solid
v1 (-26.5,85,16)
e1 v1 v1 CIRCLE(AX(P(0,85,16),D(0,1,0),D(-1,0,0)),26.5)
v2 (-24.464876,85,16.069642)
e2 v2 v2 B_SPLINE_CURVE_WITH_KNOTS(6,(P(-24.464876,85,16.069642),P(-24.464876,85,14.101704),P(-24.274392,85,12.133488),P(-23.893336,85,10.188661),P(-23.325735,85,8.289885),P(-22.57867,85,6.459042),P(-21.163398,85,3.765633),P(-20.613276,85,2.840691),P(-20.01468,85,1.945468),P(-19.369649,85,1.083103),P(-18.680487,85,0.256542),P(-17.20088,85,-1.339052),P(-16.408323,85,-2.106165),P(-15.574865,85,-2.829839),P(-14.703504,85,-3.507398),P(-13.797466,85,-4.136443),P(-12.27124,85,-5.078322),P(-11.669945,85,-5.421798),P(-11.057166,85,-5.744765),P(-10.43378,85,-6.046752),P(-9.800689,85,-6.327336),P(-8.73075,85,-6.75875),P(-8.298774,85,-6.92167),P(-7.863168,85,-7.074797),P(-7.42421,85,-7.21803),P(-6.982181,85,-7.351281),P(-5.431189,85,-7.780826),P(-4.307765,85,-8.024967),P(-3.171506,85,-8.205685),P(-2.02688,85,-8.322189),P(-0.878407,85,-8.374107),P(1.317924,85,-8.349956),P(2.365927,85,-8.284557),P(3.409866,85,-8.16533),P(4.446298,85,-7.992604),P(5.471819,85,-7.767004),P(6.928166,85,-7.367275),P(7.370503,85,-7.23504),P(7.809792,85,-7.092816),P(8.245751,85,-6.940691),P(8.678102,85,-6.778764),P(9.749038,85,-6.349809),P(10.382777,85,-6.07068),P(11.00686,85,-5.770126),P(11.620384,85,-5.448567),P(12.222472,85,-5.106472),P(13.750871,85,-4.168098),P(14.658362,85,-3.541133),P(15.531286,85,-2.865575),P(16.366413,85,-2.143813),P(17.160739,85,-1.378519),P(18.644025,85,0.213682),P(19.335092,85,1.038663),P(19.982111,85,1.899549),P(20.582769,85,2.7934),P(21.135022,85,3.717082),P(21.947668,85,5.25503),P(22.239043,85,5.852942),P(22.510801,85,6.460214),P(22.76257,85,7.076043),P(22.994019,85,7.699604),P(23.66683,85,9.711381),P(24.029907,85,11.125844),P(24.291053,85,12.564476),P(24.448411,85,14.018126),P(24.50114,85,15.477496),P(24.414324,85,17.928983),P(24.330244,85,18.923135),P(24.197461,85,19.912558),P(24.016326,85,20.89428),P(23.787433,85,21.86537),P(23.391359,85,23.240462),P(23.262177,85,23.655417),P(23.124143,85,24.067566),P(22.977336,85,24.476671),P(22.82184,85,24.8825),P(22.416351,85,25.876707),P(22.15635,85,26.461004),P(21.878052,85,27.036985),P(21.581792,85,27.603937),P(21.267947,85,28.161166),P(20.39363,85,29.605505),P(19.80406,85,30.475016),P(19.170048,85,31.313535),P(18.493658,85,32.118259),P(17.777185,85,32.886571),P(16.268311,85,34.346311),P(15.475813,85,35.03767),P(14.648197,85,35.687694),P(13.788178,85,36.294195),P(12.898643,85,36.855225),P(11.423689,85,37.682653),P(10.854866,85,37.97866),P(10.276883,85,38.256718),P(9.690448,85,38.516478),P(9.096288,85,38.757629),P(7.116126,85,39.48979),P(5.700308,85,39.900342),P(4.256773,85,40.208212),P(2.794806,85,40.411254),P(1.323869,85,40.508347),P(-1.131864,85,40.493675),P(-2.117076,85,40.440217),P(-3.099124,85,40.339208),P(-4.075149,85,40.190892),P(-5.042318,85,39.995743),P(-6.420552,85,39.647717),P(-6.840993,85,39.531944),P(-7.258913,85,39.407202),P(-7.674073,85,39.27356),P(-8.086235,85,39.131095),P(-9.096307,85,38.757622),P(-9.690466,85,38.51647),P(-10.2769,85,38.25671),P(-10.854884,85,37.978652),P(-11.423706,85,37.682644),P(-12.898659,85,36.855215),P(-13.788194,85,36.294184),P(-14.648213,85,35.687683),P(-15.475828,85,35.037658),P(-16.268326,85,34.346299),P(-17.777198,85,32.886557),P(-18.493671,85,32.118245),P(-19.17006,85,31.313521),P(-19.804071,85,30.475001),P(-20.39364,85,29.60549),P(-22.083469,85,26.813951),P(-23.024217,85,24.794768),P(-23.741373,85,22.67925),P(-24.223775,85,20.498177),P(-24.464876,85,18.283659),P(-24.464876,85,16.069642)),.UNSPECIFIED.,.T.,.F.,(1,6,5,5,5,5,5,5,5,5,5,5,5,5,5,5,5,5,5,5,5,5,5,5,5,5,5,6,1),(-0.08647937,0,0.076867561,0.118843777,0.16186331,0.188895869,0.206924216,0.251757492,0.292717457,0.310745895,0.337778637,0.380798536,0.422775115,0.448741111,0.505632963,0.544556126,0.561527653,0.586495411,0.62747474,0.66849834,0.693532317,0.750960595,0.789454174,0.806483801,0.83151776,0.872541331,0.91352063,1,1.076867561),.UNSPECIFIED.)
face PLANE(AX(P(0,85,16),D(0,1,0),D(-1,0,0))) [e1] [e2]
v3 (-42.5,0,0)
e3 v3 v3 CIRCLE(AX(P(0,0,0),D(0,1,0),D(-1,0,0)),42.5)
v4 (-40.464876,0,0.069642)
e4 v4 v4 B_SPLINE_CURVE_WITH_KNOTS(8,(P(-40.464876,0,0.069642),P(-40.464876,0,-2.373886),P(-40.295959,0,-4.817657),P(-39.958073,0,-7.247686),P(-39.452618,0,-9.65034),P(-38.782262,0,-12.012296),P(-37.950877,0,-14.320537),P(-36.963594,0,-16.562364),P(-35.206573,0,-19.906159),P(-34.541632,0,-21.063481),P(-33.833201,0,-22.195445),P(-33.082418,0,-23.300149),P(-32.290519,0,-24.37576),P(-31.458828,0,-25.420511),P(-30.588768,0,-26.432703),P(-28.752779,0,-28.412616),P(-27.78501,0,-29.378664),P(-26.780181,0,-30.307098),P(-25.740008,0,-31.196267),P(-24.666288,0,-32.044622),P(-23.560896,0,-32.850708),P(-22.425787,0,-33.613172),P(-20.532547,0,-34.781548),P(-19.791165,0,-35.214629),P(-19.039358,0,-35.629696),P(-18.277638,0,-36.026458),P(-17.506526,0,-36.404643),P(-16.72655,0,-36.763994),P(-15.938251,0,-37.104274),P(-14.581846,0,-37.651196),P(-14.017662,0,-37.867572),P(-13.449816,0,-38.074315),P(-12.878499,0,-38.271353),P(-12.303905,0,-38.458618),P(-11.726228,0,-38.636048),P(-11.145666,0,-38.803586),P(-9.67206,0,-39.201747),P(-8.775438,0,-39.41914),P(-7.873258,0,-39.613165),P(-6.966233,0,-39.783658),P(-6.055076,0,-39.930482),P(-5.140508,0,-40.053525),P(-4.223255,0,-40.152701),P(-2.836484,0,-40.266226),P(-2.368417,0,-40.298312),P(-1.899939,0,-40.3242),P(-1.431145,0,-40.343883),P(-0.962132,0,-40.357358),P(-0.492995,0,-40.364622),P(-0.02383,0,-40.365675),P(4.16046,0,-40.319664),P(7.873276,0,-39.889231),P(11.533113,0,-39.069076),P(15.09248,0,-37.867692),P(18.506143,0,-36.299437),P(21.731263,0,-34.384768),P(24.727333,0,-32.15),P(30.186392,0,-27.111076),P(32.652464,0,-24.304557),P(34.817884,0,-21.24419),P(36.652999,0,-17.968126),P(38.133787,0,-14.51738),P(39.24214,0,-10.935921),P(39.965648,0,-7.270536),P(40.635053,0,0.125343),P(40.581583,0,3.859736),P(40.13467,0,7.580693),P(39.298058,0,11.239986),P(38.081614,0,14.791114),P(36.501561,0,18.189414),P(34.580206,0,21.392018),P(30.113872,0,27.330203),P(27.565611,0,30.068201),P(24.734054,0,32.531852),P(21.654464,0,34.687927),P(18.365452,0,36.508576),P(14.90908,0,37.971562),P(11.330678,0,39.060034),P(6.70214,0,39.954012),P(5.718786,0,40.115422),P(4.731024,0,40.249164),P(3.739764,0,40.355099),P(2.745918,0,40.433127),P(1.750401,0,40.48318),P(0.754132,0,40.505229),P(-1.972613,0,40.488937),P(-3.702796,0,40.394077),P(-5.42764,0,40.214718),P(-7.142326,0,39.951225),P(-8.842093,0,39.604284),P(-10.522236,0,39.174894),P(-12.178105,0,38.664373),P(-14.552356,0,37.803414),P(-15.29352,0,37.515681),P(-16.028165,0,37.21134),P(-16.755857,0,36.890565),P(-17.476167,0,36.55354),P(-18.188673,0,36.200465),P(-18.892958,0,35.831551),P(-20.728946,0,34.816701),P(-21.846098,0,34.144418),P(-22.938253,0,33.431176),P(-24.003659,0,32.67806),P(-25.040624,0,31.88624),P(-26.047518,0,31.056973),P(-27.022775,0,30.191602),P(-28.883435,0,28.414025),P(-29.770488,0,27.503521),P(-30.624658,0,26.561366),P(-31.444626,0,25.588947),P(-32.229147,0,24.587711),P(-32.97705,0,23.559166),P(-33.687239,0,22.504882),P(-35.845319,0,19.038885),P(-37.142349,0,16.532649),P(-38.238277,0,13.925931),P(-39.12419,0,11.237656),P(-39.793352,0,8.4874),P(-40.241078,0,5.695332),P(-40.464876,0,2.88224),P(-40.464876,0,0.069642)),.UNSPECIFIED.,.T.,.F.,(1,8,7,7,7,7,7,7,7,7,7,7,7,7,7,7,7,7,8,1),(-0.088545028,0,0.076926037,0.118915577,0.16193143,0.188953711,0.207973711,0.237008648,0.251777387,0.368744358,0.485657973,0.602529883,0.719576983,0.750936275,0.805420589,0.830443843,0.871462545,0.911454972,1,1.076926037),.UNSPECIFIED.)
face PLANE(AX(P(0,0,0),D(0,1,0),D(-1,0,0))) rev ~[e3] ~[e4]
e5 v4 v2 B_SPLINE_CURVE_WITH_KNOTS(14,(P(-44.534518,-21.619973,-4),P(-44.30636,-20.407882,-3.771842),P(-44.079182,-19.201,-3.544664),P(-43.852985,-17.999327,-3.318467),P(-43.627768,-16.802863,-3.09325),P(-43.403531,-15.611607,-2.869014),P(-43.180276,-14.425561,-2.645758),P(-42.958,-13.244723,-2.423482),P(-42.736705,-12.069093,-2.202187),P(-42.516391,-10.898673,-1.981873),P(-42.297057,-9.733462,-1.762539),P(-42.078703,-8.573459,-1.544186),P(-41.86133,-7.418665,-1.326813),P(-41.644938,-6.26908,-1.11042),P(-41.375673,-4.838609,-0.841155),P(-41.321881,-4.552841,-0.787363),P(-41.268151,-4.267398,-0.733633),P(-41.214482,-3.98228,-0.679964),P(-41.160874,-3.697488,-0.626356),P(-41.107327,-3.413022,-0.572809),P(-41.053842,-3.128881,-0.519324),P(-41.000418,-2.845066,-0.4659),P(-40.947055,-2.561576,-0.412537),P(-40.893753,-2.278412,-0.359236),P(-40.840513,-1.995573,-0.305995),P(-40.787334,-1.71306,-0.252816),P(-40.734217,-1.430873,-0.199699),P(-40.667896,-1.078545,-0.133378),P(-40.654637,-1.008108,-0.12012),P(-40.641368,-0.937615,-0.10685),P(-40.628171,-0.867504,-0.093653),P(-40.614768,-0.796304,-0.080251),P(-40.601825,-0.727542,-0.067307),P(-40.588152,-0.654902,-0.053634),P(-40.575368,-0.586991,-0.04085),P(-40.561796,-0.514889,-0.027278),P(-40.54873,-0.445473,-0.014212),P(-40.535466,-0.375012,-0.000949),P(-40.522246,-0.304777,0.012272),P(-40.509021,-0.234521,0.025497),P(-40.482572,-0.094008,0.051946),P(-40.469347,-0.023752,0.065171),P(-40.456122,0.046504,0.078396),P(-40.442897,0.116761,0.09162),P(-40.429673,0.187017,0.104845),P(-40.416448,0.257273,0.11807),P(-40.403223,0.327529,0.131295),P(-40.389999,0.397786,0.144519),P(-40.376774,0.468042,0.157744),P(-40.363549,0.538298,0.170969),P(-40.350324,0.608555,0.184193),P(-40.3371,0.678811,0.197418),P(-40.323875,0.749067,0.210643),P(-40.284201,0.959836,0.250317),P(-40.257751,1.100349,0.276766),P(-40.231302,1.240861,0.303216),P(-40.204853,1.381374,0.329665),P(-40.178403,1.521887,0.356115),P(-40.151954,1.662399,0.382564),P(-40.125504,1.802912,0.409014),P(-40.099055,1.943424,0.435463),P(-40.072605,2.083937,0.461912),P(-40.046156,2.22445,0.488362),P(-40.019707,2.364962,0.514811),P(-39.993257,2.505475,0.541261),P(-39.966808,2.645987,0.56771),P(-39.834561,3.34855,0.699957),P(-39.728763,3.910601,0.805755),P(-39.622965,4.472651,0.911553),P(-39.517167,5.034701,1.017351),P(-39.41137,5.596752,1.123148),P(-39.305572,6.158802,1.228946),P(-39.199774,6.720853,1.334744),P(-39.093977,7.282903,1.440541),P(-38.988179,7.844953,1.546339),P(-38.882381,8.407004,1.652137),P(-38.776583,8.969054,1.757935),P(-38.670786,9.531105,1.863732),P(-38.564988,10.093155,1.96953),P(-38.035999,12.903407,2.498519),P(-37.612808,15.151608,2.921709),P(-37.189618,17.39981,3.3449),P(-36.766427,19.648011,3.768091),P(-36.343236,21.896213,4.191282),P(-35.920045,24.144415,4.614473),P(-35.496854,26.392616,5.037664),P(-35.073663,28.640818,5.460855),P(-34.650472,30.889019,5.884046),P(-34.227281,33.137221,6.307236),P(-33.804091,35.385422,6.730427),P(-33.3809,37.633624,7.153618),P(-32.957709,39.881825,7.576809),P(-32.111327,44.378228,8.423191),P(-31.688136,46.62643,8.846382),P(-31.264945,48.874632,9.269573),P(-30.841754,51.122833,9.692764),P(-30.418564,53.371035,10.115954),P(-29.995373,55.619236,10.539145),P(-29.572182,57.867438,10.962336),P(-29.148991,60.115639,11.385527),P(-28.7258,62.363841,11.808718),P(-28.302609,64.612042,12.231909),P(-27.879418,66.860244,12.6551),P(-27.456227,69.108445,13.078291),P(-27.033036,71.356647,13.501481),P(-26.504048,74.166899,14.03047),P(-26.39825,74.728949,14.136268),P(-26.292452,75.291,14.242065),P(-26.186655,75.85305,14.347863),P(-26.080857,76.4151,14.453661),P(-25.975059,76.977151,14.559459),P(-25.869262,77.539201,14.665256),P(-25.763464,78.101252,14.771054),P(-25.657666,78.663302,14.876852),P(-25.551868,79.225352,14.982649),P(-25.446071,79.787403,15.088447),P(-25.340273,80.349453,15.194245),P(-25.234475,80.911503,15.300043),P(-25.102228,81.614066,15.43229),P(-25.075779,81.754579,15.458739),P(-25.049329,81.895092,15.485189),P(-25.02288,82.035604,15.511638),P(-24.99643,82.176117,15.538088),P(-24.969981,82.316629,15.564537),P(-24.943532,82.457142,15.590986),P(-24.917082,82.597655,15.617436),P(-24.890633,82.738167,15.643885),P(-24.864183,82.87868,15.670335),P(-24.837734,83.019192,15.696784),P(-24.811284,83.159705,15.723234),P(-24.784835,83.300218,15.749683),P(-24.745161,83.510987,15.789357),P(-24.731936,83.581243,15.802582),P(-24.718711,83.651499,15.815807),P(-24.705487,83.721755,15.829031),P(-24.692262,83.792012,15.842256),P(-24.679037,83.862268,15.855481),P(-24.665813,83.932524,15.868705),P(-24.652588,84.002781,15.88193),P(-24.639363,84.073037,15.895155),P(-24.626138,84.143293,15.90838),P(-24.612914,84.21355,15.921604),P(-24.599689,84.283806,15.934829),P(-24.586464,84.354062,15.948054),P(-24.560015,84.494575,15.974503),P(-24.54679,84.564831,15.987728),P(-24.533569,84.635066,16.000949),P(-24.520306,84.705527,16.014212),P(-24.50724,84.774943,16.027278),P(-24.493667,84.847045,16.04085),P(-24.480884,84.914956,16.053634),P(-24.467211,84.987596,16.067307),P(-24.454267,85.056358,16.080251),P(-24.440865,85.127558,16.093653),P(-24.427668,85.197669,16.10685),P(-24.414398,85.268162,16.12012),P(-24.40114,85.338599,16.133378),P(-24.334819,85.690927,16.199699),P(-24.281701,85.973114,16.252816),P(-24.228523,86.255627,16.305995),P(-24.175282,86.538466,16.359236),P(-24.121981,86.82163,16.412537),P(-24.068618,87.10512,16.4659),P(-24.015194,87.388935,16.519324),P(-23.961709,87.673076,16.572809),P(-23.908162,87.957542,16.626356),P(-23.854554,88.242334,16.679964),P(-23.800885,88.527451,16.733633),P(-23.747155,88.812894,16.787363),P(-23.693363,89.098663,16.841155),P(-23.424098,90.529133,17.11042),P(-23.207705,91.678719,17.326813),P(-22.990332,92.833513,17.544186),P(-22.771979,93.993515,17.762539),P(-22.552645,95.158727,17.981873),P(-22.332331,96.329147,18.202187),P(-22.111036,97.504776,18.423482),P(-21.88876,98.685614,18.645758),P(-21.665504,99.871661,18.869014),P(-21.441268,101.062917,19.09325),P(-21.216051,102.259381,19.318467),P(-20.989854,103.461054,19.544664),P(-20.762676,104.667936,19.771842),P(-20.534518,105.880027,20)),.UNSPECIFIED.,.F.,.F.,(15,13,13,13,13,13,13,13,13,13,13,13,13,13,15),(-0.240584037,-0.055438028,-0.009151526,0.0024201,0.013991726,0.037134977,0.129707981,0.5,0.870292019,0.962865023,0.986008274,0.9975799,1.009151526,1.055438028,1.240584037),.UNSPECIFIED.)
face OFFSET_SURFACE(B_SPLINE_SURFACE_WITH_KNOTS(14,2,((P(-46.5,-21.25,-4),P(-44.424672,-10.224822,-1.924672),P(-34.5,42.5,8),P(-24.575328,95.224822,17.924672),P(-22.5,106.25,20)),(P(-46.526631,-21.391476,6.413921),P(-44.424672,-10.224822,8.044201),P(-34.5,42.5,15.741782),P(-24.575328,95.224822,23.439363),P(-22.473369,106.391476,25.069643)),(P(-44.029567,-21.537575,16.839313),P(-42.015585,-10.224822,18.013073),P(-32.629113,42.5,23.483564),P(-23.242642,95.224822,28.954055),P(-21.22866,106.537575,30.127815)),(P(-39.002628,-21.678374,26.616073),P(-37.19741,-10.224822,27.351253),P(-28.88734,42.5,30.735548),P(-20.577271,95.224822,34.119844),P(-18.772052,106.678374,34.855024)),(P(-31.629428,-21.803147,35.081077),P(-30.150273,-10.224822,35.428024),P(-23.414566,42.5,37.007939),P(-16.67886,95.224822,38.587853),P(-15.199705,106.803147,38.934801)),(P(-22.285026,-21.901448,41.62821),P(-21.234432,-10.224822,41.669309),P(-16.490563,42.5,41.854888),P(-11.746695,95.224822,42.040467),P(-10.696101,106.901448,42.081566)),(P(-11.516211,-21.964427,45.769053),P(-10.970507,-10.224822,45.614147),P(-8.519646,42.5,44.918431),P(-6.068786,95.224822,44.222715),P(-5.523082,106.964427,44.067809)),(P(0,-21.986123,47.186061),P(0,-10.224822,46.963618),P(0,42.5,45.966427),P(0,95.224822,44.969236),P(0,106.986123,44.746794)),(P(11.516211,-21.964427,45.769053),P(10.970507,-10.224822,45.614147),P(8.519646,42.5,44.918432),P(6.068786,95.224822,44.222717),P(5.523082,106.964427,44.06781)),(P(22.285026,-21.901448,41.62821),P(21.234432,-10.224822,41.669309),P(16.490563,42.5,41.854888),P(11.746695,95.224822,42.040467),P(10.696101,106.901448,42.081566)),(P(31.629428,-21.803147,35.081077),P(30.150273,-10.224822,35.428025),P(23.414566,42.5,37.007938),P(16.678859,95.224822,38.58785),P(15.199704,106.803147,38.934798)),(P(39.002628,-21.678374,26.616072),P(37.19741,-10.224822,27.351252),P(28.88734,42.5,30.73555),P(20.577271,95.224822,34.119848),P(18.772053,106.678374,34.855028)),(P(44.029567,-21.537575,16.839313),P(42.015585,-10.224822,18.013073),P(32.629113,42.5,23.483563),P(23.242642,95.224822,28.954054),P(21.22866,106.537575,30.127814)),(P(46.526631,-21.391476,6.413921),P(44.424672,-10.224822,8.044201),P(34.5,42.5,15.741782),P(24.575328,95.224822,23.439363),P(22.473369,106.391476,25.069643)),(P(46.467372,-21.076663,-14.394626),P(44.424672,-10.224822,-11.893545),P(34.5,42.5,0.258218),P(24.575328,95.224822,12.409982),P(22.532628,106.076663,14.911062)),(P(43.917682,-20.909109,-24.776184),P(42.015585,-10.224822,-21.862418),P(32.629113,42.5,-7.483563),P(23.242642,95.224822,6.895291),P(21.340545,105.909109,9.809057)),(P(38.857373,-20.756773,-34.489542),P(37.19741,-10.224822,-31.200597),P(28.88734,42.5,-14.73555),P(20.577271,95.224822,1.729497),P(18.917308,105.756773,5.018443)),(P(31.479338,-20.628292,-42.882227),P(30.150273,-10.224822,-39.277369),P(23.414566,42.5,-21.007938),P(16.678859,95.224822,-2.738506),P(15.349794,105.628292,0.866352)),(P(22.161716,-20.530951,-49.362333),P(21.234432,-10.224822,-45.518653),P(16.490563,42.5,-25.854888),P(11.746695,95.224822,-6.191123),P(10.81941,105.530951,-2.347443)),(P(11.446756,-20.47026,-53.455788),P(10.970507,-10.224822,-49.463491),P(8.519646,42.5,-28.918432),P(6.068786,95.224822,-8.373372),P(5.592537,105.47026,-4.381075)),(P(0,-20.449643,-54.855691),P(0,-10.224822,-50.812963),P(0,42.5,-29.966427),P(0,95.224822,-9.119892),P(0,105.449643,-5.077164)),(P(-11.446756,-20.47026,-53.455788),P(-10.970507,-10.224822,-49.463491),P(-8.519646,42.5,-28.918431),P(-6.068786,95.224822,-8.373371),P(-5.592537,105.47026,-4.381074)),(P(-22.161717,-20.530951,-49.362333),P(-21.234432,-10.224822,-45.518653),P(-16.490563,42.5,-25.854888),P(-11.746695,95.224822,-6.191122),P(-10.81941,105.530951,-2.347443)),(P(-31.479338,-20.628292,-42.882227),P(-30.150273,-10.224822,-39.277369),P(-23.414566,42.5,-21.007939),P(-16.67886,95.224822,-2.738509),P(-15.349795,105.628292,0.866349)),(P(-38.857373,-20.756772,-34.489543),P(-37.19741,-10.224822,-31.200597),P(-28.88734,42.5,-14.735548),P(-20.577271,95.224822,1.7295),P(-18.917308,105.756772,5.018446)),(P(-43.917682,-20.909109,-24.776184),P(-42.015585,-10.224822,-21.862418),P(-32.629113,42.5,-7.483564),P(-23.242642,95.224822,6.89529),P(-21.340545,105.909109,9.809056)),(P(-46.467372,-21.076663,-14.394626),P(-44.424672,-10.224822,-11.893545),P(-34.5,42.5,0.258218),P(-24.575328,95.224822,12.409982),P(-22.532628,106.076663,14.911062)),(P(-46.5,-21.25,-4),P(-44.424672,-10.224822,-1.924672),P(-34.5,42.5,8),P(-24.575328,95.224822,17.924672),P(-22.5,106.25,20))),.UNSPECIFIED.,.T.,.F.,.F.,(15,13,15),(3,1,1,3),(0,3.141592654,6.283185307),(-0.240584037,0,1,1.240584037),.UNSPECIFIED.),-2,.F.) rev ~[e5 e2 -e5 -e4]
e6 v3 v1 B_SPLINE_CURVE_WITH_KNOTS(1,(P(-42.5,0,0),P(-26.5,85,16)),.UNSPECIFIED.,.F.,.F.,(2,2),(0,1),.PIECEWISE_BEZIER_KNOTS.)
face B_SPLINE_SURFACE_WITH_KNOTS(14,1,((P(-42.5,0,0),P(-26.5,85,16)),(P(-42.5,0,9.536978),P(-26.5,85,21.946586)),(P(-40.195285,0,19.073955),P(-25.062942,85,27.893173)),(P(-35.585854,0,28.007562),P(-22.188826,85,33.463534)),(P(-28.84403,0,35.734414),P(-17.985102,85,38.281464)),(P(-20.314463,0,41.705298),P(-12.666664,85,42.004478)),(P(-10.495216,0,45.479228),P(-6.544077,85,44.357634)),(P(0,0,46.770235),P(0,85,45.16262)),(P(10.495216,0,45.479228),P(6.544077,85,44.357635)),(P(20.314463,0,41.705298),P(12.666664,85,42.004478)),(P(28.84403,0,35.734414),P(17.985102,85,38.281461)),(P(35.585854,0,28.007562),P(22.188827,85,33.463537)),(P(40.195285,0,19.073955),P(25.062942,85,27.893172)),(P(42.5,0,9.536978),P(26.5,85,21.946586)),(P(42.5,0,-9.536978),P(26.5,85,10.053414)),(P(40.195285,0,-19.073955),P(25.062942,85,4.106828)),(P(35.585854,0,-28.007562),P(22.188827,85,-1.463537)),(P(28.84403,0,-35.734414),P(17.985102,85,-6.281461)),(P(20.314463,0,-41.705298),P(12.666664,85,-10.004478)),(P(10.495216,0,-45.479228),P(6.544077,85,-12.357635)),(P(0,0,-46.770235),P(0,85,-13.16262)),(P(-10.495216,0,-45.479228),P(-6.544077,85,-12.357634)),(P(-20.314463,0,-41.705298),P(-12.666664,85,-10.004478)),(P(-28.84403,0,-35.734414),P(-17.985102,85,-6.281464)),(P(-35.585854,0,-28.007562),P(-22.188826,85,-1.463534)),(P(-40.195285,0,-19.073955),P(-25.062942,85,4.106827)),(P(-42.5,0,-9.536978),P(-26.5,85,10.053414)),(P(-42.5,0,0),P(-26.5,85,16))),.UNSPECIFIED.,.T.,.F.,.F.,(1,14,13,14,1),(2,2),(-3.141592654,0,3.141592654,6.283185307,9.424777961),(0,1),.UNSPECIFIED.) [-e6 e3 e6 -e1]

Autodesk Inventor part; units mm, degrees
ref_plane "YZ Plane" through (0, 0, 0) normal (1, 0, 0) x (0, 1, 0)
ref_plane "XY Plane" through (0, 0, 0) normal (0, 0, 1) x (1, 0, 0)
sketch "Szkic6" plane through (0, 0, 0) normal (0, 1, 0) x (-1, 0, 0)
  circle A0 centre (0, 0) radius 42.5
  dimension "d33" = 85
ref_plane "Płaszczyzna konstrukcyjna1" through (0, 85, 0) normal (0, 1, 0) x (-1, 0, 0)
sketch "Szkic7" plane through (0, 85, 0) normal (0, 1, 0) x (-1, 0, 0)
  circle A0 centre (0, 16) radius 26.5
  line L0 (0, -20.3) -> (0, 20.3) construction
  circle A1 centre (0, 0) radius 42.5 construction
  dimension "d35" = 53
loft "Wyciągnięcie złożone1" add profiles "Szkic6", "Szkic7"
shell "Skorupa1" thickness 2 removed faces 2 at (-1.8199, 85, 13.4501) at (10.6049, 0, 7.3037)
equation "\"d33\" = OD1"
equation "\"d35\" = OD2"
equation "\"d52\" = THK"
equation "\"SzerokośćGięciaPodcięcia\" = Grubość"
equation "\"RozmiarPodcięciaNarożnika\" = 4 * Grubość"
equation "\"PromieńPrzejścia\" = PromieńGięcia"
equation "\"Rozmiar_promienia_Jacobiego\" = PromieńGięcia"
equation "\"Wielk_odstępu\" = Grubość"
equation "\"d2\" = PromieńGięcia"
equation "\"d23\" = PromieńGięcia"
equation "\"OD1\" = 85"
equation "\"OD2\" = 53"
equation "\"L\" = 85"
equation "\"THK\" = 2"
equation "\"d34\" = L"
equation "\"Grubość\" = 1.5"
equation "\"PromieńGięcia\" = 3"
properties part number "Redukcja asymetryczna Ø85x53x2 L=85" material "304"
